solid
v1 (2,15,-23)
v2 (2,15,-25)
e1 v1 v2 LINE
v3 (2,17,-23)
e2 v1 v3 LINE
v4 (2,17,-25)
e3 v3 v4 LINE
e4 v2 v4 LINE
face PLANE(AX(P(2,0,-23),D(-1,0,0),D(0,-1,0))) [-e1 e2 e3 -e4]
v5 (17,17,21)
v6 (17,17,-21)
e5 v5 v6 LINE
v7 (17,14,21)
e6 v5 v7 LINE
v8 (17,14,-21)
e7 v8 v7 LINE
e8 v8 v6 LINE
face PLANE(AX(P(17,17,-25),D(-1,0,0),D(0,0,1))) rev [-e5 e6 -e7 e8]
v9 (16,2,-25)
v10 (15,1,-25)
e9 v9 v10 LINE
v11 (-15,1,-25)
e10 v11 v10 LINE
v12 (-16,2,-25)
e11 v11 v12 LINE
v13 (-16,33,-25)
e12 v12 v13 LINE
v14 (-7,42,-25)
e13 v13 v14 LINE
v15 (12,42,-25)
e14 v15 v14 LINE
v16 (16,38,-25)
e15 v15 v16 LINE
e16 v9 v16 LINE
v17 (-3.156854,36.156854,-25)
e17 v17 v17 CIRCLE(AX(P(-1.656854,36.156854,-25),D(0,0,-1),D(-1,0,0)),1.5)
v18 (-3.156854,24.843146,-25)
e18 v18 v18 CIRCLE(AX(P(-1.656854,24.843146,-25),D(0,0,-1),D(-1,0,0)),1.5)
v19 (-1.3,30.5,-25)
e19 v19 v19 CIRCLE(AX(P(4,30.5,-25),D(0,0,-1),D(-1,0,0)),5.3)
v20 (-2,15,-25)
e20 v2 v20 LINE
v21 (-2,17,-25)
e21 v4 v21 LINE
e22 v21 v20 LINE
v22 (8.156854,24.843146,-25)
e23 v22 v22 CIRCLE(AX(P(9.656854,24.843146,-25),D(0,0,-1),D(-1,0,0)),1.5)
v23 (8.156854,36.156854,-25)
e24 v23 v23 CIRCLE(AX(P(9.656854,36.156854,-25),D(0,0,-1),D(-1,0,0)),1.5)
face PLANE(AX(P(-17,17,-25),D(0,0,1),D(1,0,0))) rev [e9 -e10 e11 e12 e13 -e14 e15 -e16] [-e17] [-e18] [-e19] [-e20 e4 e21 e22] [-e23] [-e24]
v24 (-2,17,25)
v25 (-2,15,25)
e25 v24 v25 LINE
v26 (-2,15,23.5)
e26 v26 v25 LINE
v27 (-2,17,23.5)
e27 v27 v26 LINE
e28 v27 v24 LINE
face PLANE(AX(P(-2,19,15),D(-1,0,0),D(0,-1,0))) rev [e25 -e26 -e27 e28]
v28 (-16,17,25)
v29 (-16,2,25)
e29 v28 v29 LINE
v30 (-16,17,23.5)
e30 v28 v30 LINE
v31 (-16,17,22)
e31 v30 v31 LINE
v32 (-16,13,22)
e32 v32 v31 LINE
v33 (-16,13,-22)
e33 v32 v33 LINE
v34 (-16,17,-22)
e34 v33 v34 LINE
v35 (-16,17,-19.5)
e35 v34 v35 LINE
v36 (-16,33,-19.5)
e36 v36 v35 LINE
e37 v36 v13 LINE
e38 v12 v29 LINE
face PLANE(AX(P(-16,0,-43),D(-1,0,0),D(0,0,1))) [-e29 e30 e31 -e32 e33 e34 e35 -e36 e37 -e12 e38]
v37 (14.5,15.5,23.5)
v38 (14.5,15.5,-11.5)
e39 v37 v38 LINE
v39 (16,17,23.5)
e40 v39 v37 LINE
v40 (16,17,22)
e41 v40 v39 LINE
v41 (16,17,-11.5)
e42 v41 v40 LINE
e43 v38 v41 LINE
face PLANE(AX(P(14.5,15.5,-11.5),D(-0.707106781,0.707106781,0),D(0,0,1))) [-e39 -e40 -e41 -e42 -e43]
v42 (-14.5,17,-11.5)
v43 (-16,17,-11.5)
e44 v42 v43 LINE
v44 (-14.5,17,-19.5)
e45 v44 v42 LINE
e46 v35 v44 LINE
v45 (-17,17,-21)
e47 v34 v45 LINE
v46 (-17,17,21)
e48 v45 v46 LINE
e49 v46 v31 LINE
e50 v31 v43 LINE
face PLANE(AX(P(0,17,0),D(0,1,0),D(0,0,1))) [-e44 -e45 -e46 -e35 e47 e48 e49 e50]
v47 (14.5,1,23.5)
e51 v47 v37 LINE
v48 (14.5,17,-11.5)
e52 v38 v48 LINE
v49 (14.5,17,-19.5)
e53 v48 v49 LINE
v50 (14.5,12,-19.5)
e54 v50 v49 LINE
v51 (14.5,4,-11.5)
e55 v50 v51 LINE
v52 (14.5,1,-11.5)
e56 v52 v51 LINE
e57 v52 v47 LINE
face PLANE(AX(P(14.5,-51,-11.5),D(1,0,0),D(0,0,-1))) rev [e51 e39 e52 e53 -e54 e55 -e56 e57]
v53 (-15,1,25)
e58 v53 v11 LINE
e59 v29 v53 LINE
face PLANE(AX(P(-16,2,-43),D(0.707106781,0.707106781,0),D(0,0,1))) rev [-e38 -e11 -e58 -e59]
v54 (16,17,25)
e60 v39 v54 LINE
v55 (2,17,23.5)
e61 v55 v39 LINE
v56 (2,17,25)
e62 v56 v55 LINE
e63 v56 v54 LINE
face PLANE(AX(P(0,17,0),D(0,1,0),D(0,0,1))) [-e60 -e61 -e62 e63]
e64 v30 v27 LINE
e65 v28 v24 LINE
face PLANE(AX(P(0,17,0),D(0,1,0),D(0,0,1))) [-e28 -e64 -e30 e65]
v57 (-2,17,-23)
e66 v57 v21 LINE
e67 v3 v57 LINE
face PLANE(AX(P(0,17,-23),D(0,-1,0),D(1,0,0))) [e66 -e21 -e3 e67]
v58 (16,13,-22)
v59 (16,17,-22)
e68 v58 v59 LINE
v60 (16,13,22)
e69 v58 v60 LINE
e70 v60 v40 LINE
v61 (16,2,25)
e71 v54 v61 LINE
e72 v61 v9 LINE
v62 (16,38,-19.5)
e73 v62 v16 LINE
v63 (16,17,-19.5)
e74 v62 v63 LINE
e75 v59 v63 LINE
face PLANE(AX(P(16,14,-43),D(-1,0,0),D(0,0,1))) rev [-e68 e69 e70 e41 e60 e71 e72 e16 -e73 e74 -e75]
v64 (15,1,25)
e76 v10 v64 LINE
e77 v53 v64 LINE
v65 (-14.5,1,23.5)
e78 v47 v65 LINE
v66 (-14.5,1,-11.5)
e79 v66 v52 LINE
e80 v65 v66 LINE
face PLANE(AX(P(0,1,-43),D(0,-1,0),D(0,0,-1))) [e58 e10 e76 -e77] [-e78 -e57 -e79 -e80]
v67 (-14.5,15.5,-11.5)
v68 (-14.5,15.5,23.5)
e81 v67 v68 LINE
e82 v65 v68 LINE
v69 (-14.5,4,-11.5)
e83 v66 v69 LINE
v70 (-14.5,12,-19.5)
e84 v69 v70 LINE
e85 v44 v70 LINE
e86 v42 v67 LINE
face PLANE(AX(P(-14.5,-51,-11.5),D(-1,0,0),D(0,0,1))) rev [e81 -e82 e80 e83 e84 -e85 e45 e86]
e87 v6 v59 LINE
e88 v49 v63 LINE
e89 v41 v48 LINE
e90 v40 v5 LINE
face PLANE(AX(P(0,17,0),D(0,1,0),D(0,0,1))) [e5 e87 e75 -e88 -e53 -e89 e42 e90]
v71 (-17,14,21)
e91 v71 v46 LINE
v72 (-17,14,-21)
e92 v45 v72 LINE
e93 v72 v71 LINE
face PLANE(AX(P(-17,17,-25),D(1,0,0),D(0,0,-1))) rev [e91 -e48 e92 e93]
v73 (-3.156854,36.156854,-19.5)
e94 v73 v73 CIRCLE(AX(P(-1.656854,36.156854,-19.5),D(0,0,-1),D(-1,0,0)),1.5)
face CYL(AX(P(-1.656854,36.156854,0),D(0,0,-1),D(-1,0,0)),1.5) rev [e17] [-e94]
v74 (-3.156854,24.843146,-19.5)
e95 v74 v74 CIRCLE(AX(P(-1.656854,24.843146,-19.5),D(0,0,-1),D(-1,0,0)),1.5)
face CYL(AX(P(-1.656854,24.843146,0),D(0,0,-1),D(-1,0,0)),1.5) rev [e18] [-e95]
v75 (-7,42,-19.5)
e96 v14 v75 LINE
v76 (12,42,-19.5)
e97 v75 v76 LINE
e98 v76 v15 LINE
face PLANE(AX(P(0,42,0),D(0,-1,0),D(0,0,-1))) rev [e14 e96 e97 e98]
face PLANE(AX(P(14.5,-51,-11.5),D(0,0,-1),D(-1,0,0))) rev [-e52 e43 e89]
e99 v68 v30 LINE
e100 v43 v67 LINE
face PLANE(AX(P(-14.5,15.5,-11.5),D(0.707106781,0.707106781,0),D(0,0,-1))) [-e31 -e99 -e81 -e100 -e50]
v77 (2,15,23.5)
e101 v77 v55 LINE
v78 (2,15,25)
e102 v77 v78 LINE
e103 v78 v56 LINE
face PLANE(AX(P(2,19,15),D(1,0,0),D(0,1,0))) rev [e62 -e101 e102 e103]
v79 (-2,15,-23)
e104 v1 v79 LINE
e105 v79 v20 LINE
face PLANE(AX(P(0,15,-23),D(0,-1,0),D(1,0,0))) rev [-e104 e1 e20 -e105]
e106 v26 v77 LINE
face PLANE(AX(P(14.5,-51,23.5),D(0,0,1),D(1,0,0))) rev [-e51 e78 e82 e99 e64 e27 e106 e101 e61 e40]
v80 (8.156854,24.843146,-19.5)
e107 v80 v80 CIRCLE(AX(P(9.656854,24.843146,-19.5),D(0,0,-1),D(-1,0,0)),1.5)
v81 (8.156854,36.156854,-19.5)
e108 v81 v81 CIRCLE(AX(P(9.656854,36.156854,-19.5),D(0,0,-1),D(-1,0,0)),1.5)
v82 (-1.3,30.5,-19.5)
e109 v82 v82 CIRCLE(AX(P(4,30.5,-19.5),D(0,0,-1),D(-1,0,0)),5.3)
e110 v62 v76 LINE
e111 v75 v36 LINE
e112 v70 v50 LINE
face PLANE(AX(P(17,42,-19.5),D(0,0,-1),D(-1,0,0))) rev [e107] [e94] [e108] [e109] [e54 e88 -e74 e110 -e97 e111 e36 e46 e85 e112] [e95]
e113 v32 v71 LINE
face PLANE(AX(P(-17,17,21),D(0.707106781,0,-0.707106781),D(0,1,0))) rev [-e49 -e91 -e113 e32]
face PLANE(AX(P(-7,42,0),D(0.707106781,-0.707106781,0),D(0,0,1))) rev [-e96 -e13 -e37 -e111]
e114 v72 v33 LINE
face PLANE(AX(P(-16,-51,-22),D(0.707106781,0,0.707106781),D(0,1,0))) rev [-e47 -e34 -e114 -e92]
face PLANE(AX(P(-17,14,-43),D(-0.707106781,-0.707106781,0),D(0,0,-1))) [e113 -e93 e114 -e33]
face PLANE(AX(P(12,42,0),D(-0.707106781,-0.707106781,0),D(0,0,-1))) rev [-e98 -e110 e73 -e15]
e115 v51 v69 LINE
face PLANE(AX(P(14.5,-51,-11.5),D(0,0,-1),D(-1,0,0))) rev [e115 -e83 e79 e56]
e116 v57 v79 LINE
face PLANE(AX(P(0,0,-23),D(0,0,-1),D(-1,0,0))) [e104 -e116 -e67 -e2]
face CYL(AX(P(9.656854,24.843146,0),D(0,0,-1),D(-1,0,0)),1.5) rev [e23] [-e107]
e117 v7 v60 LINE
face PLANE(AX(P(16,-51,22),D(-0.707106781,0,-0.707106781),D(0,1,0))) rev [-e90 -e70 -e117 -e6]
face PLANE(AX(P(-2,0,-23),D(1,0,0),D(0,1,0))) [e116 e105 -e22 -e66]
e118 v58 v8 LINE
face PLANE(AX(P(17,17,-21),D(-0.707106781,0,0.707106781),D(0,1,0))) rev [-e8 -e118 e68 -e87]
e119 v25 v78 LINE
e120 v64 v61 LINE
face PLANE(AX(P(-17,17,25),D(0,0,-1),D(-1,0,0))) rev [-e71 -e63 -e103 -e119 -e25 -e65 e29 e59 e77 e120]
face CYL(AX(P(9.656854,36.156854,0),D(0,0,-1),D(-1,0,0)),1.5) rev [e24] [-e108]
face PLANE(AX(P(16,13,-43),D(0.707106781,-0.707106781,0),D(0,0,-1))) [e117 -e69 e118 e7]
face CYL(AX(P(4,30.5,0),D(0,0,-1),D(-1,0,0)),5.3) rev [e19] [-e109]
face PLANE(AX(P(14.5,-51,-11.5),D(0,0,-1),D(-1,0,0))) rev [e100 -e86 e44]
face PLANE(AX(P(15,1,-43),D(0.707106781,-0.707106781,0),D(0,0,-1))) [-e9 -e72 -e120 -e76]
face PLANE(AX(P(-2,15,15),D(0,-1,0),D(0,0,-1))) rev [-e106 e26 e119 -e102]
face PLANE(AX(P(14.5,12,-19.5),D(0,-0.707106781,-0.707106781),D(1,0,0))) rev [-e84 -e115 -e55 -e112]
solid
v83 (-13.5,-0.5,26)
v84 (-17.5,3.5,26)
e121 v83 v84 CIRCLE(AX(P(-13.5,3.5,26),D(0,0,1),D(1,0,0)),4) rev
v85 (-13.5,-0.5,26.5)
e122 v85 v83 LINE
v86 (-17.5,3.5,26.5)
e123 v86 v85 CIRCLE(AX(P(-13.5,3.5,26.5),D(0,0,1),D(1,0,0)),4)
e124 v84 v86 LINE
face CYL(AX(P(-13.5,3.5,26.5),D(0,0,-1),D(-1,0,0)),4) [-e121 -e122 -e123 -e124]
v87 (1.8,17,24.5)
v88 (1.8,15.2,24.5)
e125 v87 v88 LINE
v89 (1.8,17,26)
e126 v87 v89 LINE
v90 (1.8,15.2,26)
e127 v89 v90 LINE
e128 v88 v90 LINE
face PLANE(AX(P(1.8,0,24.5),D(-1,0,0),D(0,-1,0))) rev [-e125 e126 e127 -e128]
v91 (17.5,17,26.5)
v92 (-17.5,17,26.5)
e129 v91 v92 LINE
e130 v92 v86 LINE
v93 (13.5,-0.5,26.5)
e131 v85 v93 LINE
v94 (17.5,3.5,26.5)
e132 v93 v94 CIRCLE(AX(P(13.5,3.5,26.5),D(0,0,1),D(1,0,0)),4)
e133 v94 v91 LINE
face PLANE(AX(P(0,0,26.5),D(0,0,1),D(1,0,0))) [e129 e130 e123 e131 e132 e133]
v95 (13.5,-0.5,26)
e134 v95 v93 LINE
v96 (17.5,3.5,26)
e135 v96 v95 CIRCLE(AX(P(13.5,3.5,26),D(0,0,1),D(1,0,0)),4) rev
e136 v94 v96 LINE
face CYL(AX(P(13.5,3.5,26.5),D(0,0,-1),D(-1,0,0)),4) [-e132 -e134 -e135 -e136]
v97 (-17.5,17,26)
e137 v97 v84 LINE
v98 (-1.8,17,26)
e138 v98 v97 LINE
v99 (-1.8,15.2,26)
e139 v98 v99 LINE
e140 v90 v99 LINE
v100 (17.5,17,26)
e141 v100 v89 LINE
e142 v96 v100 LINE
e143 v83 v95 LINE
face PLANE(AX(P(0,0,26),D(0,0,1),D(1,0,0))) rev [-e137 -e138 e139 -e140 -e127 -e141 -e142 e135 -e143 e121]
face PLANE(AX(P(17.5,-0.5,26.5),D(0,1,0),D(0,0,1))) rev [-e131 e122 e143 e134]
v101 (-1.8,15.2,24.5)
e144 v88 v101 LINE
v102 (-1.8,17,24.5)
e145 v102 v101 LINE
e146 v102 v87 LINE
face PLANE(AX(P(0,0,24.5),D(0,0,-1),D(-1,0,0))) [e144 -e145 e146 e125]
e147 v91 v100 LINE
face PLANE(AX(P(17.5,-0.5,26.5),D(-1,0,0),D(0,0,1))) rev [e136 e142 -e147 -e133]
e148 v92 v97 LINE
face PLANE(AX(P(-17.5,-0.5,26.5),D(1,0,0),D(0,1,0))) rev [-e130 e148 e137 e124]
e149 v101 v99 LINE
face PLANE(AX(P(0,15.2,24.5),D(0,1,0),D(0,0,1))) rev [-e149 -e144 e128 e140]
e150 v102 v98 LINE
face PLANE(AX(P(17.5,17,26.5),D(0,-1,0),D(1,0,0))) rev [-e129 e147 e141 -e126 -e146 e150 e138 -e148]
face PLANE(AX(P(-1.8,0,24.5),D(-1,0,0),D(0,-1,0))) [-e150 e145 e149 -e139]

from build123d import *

# Parameters (mm, degrees)
SZKIC1_W                    = 34
SZKIC1_H                    = 50
DODANIE_WYCI_GNI_CIE1_DEPTH = 17
SZKIC3_W                    = 34
SZKIC3_H                    = 5.5
DODANIE_WYCI_GNI_CIE2_DEPTH = 25
SZKIC4_R                    = 1.5
SZKIC4_R_2                  = 5.3
WYTNIJ_WYCI_GNI_CIE2_DEPTH  = 25
SFAZOWANIE1_SIZE            = 10
SFAZOWANIE2_SIZE            = 5
WYTNIJ_WYCI_GNI_CIE3_START  = -50
WYTNIJ_WYCI_GNI_CIE3_DEPTH  = 50
SFAZOWANIE3_SIZE            = 1
SFAZOWANIE4_SIZE            = 1
SZKIC7_W                    = 35
SZKIC7_H                    = 17.5
DODANIE_WYCI_GNI_CIE3_DEPTH = 0.5
ZAOKR_GLENIE3_R             = 4
SZKIC8_W                    = 1
SZKIC8_H                    = 3
WYTNIJ_WYCI_GNI_CIE4_DEPTH  = 68
SFAZOWANIE6_SIZE            = 1
SZKIC9_W                    = 29
SZKIC9_H                    = 35
WYTNIJ_WYCI_GNI_CIE5_DEPTH  = 68
SFAZOWANIE7_SIZE            = 1.5
SZKIC10_W                   = 4
SZKIC10_H                   = 4
WYTNIJ_WYCI_GNI_CIE6_DEPTH  = 10
SZKIC11_W                   = 3.6
SZKIC11_H                   = 1.8
DODANIE_WYCI_GNI_CIE4_DEPTH = 1.5
SZKIC12_W                   = 29
SZKIC12_H                   = 10
WYTNIJ_WYCI_GNI_CIE7_DEPTH  = 8
SFAZOWANIE8_SIZE            = 8
SZKIC13_W                   = 4
SZKIC13_H                   = 2
WYTNIJ_WYCI_GNI_CIE8_DEPTH  = 2


# Read off the part's stored shape, not the designer's step: Wytnij-wyciągnięcie3
with BuildPart() as part:
    # Szkic1 → Dodanie-wyciągnięcie1 (new body)
    with BuildSketch(Plane(origin=(0, 0, 0), x_dir=(1, 0, 0), z_dir=(0, 1, 0))):
        Rectangle(SZKIC1_W, SZKIC1_H)
    extrude(amount=DODANIE_WYCI_GNI_CIE1_DEPTH)

    # Szkic3 → Dodanie-wyciągnięcie2 (add)
    with BuildSketch(Plane(origin=(0, 17, 0), x_dir=(1, 0, 0), z_dir=(0, 1, 0))):
        with Locations((0, 22.25)):
            Rectangle(SZKIC3_W, SZKIC3_H)
    extrude(amount=DODANIE_WYCI_GNI_CIE2_DEPTH)

    # Szkic4 → Wytnij-wyciągnięcie2 (cut)
    with BuildSketch(Plane(origin=(0, 0, -25), x_dir=(-1, 0, 0), z_dir=(0, 0, -1))):
        with Locations((1.656854249, 36.156854249)):
            Circle(SZKIC4_R)
        with Locations((-4, 30.5)):
            Circle(SZKIC4_R_2)
        with Locations((-9.656854249, 36.156854249)):
            Circle(SZKIC4_R)
        with Locations((1.656854249, 24.843145751)):
            Circle(SZKIC4_R)
        with Locations((-9.656854249, 24.843145751)):
            Circle(SZKIC4_R)
    extrude(amount=-WYTNIJ_WYCI_GNI_CIE2_DEPTH, mode=Mode.SUBTRACT)

    # Sfazowanie1
    sfazowanie1_edges = [part.edges().sort_by_distance(p)[0] for p in [
        (-17, 42, -22.25),
    ]]
    chamfer(sfazowanie1_edges, length=SFAZOWANIE1_SIZE)

    # Sfazowanie2
    sfazowanie2_edges = [part.edges().sort_by_distance(p)[0] for p in [
        (17, 42, -22.25),
    ]]
    chamfer(sfazowanie2_edges, length=SFAZOWANIE2_SIZE)

    # Wytnij-wyciągnięcie3 outline → Wytnij-wyciągnięcie3 (cut)
    with BuildSketch(Plane.XY.offset(25).offset(WYTNIJ_WYCI_GNI_CIE3_START)):
        Polygon((16, 38), (16, 17), (17, 17), (17, 37), align=None)
        Polygon((-17, 17), (-16, 17), (-16, 33), (-17, 32), align=None)
        Polygon((17, 0), (17, 14), (16, 14), (16, 1), (-16, 1), (-16, 14), (-17, 14), (-17, 0), align=None)
    extrude(amount=WYTNIJ_WYCI_GNI_CIE3_DEPTH, mode=Mode.SUBTRACT)

    # Sfazowanie3
    sfazowanie3_edges = [part.edges().sort_by_distance(p)[0] for p in [
        (-16, 14, 0),
        (16, 14, 0),
    ]]
    chamfer(sfazowanie3_edges, length=SFAZOWANIE3_SIZE - 0.0001)  # a hair under: the kernel refuses the full size

    # Sfazowanie4
    sfazowanie4_edges = [part.edges().sort_by_distance(p)[0] for p in [
        (-16, 1, 0),
        (16, 1, 0),
    ]]
    chamfer(sfazowanie4_edges, length=SFAZOWANIE4_SIZE)

    # Szkic8 → Wytnij-wyciągnięcie4 (cut)
    with BuildSketch(Plane(origin=(0, 17, 0), x_dir=(1, 0, 0), z_dir=(0, 1, 0))):
        with Locations((-16.5, 23.5)):
            Rectangle(SZKIC8_W, SZKIC8_H)
        with Locations((16.5, 23.5)):
            Rectangle(SZKIC8_W, SZKIC8_H)
        with Locations((-16.5, -23.5)):
            Rectangle(SZKIC8_W, SZKIC8_H)
        with Locations((16.5, -23.5)):
            Rectangle(SZKIC8_W, SZKIC8_H)
    extrude(amount=-WYTNIJ_WYCI_GNI_CIE4_DEPTH, mode=Mode.SUBTRACT)

    # Sfazowanie6
    sfazowanie6_edges = [part.edges().sort_by_distance(p)[0] for p in [
        (-17, 15.5, -22),
        (17, 15.5, -22),
        (17, 15.5, 22),
        (-17, 15.5, 22),
    ]]
    chamfer(sfazowanie6_edges, length=SFAZOWANIE6_SIZE - 0.0001)  # a hair under: the kernel refuses the full size

    # Szkic9 → Wytnij-wyciągnięcie5 (cut)
    with BuildSketch(Plane(origin=(0, 17, 0), x_dir=(1, 0, 0), z_dir=(0, 1, 0))):
        with Locations((0, -6)):
            Rectangle(SZKIC9_W, SZKIC9_H)
    extrude(amount=-WYTNIJ_WYCI_GNI_CIE5_DEPTH, mode=Mode.SUBTRACT)

    # Sfazowanie7
    sfazowanie7_edges = [part.edges().sort_by_distance(p)[0] for p in [
        (-14.5, 17, 6),
        (14.5, 17, 6),
    ]]
    chamfer(sfazowanie7_edges, length=SFAZOWANIE7_SIZE - 0.0001)  # a hair under: the kernel refuses the full size

    # Szkic10 → Wytnij-wyciągnięcie6 (cut)
    with BuildSketch(Plane.XY.offset(25)):
        with Locations((0, 17)):
            Rectangle(SZKIC10_W, SZKIC10_H)
    extrude(amount=-WYTNIJ_WYCI_GNI_CIE6_DEPTH, mode=Mode.SUBTRACT)

    # Szkic12 → Wytnij-wyciągnięcie7 (cut)
    with BuildSketch(Plane.XY.offset(-11.5)):
        with Locations((0, 17)):
            Rectangle(SZKIC12_W, SZKIC12_H)
    extrude(amount=-WYTNIJ_WYCI_GNI_CIE7_DEPTH, mode=Mode.SUBTRACT)

    # Sfazowanie8
    sfazowanie8_edges = [part.edges().sort_by_distance(p)[0] for p in [
        (0, 12, -11.5),
    ]]
    chamfer(sfazowanie8_edges, length=SFAZOWANIE8_SIZE - 0.0001)  # a hair under: the kernel refuses the full size

    # Szkic13 → Wytnij-wyciągnięcie8 (cut)
    with BuildSketch(Plane(origin=(0, 0, -25), x_dir=(-1, 0, 0), z_dir=(0, 0, -1))):
        with Locations((0, 16)):
            Rectangle(SZKIC13_W, SZKIC13_H)
    extrude(amount=-WYTNIJ_WYCI_GNI_CIE8_DEPTH, mode=Mode.SUBTRACT)


with BuildPart() as body_2:
    # Szkic7 → Dodanie-wyciągnięcie3 (new body)
    with BuildSketch(Plane.XY.offset(26)):
        with Locations((0, 8.25)):
            Rectangle(SZKIC7_W, SZKIC7_H)
    extrude(amount=DODANIE_WYCI_GNI_CIE3_DEPTH)

    # Zaokrąglenie3
    zaokr_glenie3_edges = [body_2.edges().sort_by_distance(p)[0] for p in [
        (17.5, -0.5, 26.25),
        (-17.5, -0.5, 26.25),
    ]]
    fillet(zaokr_glenie3_edges, radius=ZAOKR_GLENIE3_R)

    # Szkic11 → Dodanie-wyciągnięcie4 (add)
    with BuildSketch(Plane(origin=(0, 0, 26), x_dir=(-1, 0, 0), z_dir=(0, 0, -1))):
        with Locations((0, 16.1)):
            Rectangle(SZKIC11_W, SZKIC11_H)
    extrude(amount=DODANIE_WYCI_GNI_CIE4_DEPTH)


solid = Compound([part.part, body_2.part])
